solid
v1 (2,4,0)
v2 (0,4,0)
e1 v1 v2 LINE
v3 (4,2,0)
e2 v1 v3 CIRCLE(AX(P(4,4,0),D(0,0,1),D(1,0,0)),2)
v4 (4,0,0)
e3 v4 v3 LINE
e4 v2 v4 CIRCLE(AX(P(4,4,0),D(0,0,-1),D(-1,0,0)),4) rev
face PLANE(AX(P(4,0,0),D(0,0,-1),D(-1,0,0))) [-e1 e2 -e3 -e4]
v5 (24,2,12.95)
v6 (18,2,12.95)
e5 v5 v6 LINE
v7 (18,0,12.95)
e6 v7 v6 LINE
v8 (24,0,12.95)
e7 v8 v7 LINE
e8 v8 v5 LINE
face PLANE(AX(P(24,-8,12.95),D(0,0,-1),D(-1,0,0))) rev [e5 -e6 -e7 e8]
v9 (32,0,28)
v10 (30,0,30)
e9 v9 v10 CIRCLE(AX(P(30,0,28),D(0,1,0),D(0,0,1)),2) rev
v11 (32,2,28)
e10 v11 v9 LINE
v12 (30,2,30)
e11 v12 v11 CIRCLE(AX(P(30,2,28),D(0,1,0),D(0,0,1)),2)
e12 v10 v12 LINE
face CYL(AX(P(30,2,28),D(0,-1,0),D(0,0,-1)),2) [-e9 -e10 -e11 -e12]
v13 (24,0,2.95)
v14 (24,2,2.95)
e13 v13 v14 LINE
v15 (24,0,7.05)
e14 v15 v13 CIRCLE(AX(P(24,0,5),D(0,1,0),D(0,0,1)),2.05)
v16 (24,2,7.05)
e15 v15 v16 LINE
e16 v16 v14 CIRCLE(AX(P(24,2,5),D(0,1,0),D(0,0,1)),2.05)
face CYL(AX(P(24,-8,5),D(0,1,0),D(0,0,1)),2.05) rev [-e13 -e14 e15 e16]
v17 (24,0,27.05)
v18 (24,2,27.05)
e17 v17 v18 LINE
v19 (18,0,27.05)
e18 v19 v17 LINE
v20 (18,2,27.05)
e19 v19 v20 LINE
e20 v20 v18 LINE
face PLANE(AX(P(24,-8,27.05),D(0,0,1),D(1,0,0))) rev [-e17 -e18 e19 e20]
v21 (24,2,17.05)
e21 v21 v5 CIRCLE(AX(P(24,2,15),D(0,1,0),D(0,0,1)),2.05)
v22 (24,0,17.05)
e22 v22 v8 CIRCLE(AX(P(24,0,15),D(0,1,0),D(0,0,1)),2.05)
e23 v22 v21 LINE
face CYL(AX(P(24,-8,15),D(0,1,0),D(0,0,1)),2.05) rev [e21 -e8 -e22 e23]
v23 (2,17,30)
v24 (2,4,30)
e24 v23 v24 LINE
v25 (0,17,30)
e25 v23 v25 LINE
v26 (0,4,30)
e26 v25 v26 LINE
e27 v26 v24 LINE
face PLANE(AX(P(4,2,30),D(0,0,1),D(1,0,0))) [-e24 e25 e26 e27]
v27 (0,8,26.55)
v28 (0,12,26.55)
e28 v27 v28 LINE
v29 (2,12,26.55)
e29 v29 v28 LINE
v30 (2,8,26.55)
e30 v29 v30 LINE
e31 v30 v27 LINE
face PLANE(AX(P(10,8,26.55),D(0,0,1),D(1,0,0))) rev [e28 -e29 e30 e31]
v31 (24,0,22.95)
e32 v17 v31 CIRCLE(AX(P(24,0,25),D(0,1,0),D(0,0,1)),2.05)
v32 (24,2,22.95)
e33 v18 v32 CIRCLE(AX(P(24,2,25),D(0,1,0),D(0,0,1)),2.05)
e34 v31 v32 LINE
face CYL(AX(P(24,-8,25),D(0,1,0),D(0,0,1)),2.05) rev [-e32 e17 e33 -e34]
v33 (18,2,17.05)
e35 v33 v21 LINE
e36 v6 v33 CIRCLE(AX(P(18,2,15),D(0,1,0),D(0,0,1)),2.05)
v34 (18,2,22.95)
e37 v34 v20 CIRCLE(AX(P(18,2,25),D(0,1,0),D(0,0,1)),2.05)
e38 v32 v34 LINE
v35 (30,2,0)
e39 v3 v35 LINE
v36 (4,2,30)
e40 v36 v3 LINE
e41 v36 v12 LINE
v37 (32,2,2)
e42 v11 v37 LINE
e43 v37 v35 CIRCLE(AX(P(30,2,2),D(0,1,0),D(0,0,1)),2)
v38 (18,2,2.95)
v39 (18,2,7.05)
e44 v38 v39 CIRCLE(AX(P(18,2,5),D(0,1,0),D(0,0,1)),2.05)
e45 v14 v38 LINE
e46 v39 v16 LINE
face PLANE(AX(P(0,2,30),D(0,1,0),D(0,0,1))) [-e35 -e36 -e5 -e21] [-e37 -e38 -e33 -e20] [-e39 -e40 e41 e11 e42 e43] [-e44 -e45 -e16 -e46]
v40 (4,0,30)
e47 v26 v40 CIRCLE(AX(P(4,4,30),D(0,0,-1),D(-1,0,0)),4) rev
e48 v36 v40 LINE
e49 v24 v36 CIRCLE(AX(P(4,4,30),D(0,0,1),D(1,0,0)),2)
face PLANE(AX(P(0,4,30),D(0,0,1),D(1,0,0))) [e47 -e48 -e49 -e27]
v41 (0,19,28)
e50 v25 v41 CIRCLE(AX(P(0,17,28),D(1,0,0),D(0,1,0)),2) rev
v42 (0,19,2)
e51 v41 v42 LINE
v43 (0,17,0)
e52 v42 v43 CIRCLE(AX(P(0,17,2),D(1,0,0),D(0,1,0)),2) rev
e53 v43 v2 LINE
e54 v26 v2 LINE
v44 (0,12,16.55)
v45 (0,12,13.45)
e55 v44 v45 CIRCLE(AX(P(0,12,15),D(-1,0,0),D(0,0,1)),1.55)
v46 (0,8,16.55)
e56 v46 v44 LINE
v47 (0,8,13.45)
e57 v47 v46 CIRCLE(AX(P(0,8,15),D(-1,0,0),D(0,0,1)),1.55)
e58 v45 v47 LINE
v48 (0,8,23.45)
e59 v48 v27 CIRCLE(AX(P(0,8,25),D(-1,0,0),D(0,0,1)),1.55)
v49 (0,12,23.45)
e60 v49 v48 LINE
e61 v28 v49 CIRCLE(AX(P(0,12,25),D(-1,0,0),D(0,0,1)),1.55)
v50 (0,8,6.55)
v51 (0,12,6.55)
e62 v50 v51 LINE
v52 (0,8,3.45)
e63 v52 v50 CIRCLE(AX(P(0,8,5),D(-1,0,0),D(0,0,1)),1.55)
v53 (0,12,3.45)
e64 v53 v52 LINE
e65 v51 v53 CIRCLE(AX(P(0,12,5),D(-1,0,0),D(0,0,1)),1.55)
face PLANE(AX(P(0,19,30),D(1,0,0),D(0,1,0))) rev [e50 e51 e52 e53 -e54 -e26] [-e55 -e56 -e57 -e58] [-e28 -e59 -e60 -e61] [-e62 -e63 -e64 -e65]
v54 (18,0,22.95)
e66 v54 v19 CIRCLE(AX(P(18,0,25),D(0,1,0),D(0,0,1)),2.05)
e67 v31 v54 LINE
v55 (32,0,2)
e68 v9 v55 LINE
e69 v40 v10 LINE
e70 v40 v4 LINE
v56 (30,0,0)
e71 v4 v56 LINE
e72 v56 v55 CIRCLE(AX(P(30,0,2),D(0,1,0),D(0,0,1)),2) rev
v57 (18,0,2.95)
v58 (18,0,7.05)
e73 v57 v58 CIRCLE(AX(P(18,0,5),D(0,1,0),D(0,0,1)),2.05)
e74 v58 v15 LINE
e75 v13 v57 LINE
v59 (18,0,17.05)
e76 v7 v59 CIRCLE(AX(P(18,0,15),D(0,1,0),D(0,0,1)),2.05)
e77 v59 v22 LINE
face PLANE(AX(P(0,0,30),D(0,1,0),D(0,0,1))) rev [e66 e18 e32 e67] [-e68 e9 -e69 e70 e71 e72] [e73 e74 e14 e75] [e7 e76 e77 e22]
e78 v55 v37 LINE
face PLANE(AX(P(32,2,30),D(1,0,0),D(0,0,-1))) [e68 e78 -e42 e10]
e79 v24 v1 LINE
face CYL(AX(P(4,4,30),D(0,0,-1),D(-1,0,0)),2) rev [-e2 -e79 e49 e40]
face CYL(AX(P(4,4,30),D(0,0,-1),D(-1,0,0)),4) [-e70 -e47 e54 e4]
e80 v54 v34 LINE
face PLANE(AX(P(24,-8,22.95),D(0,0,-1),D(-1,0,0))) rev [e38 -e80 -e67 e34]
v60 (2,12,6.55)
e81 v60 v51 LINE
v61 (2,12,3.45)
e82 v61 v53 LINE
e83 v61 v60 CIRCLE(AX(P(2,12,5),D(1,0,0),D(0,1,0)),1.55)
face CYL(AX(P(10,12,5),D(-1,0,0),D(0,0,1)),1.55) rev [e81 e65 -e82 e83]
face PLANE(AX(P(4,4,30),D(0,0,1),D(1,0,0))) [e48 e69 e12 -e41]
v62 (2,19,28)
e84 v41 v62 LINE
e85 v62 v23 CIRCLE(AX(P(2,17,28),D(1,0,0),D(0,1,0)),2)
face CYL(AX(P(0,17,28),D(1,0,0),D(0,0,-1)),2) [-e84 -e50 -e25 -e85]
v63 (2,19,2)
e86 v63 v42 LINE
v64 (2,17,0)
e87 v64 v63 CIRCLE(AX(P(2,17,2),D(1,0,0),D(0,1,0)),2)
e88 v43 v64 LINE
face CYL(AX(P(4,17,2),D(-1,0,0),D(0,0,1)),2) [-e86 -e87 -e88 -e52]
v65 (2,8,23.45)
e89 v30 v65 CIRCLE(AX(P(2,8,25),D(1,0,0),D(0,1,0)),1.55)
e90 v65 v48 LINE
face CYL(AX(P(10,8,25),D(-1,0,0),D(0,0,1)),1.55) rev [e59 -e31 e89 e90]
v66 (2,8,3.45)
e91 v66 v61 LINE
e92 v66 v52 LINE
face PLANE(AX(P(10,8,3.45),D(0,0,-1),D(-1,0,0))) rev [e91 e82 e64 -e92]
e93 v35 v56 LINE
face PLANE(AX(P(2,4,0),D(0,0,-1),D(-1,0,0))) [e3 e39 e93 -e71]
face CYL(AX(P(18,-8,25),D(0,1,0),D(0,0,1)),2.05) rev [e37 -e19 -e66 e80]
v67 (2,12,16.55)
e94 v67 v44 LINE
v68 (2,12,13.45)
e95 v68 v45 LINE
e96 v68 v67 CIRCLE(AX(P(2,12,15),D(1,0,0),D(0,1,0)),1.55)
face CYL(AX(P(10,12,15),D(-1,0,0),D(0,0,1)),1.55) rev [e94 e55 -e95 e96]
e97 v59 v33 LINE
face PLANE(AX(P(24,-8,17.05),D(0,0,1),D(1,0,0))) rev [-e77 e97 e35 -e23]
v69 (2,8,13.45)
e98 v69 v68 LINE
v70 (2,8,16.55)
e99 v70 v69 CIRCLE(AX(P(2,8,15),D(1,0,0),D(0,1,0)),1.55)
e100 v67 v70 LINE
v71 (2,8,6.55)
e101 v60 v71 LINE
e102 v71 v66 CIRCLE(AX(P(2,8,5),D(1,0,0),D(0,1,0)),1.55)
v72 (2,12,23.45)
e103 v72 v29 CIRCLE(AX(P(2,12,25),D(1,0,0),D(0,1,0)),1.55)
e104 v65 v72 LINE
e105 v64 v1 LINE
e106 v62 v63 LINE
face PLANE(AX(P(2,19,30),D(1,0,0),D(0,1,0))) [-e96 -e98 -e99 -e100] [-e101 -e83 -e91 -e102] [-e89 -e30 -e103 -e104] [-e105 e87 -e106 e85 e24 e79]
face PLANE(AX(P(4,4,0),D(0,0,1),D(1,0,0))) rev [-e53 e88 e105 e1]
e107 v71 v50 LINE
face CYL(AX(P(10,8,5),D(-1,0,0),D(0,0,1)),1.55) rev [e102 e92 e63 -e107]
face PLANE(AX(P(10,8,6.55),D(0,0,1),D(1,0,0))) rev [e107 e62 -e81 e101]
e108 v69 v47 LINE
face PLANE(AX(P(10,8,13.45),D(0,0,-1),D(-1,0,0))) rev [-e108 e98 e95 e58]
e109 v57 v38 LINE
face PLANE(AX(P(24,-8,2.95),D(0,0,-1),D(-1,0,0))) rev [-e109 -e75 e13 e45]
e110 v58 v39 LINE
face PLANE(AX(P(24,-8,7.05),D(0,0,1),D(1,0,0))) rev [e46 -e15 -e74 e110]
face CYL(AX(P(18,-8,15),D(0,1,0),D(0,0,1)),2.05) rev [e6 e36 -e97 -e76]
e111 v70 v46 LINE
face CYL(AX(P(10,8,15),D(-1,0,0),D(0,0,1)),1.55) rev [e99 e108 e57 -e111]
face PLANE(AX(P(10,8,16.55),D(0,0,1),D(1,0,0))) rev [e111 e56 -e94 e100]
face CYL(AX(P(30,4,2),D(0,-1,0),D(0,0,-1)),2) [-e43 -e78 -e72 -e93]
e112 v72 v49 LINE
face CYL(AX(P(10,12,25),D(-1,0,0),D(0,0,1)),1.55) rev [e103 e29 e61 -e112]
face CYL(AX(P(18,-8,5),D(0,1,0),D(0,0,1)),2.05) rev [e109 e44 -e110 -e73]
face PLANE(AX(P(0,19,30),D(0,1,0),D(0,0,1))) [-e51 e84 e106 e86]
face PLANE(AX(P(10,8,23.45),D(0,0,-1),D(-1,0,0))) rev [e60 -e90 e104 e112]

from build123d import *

# Parameters (mm, degrees)
SM_BASE_FLANGE_1_DEPTH = 30
CUT_EXTRUDE_1_DEPTH    = 10
CUT_EXTRUDE_2_DEPTH    = 10
FILLET_1_R             = 2


# Sheet-metal steps are written as plain solids
with BuildPart() as part:
    # Sketch 1 → 基体-法兰1 (new body)
    with BuildSketch(Plane.XY):
        with BuildLine():
            Line((0, 19), (0, 4))
            ThreePointArc((0, 4), (1.171572875, 1.171572875), (4, 0))
            Line((4, 0), (32, 0))
            Line((32, 0), (32, 2))
            Line((32, 2), (4, 2))
            ThreePointArc((4, 2), (2.585786438, 2.585786438), (2, 4))
            Line((2, 4), (2, 19))
            Line((2, 19), (0, 19))
        make_face()
    extrude(amount=SM_BASE_FLANGE_1_DEPTH)

    # 草图6 → 切除-拉伸1 (cut)
    with BuildSketch(Plane.ZY):
        with BuildLine():
            Line((23.45, 8), (23.45, 12))
            ThreePointArc((23.45, 12), (25, 13.55), (26.55, 12))
            Line((26.55, 12), (26.55, 8))
            ThreePointArc((26.55, 8), (25, 6.45), (23.45, 8))
        make_face()
        with BuildLine():
            Line((13.45, 8), (13.45, 12))
            ThreePointArc((13.45, 12), (15, 13.55), (16.55, 12))
            Line((16.55, 12), (16.55, 8))
            ThreePointArc((16.55, 8), (15, 6.45), (13.45, 8))
        make_face()
        with BuildLine():
            Line((3.45, 8), (3.45, 12))
            ThreePointArc((3.45, 12), (5, 13.55), (6.55, 12))
            Line((6.55, 12), (6.55, 8))
            ThreePointArc((6.55, 8), (5, 6.45), (3.45, 8))
        make_face()
    extrude(amount=-CUT_EXTRUDE_1_DEPTH, mode=Mode.SUBTRACT)

    # 草图10 → 切除-拉伸2 (cut)
    with BuildSketch(Plane(origin=(0, 2, 0), x_dir=(1, 0, 0), z_dir=(0, 1, 0))):
        with BuildLine():
            Line((24, -27.05), (18, -27.05))
            ThreePointArc((18, -27.05), (15.95, -25), (18, -22.95))
            Line((18, -22.95), (24, -22.95))
            ThreePointArc((24, -22.95), (26.05, -25), (24, -27.05))
        make_face()
        with BuildLine():
            Line((24, -17.05), (18, -17.05))
            ThreePointArc((18, -17.05), (15.95, -15), (18, -12.95))
            Line((18, -12.95), (24, -12.95))
            ThreePointArc((24, -12.95), (26.05, -15), (24, -17.05))
        make_face()
        with BuildLine():
            Line((24, -7.05), (18, -7.05))
            ThreePointArc((18, -7.05), (15.95, -5), (18, -2.95))
            Line((18, -2.95), (24, -2.95))
            ThreePointArc((24, -2.95), (26.05, -5), (24, -7.05))
        make_face()
    extrude(amount=-CUT_EXTRUDE_2_DEPTH, mode=Mode.SUBTRACT)

    # 圆角1
    fillet_1_edges = [part.edges().sort_by_distance(p)[0] for p in [
        (1, 19, 30),
        (1, 19, 0),
        (32, 1, 30),
        (32, 1, 0),
    ]]
    fillet(fillet_1_edges, radius=FILLET_1_R)


solid = part.part
